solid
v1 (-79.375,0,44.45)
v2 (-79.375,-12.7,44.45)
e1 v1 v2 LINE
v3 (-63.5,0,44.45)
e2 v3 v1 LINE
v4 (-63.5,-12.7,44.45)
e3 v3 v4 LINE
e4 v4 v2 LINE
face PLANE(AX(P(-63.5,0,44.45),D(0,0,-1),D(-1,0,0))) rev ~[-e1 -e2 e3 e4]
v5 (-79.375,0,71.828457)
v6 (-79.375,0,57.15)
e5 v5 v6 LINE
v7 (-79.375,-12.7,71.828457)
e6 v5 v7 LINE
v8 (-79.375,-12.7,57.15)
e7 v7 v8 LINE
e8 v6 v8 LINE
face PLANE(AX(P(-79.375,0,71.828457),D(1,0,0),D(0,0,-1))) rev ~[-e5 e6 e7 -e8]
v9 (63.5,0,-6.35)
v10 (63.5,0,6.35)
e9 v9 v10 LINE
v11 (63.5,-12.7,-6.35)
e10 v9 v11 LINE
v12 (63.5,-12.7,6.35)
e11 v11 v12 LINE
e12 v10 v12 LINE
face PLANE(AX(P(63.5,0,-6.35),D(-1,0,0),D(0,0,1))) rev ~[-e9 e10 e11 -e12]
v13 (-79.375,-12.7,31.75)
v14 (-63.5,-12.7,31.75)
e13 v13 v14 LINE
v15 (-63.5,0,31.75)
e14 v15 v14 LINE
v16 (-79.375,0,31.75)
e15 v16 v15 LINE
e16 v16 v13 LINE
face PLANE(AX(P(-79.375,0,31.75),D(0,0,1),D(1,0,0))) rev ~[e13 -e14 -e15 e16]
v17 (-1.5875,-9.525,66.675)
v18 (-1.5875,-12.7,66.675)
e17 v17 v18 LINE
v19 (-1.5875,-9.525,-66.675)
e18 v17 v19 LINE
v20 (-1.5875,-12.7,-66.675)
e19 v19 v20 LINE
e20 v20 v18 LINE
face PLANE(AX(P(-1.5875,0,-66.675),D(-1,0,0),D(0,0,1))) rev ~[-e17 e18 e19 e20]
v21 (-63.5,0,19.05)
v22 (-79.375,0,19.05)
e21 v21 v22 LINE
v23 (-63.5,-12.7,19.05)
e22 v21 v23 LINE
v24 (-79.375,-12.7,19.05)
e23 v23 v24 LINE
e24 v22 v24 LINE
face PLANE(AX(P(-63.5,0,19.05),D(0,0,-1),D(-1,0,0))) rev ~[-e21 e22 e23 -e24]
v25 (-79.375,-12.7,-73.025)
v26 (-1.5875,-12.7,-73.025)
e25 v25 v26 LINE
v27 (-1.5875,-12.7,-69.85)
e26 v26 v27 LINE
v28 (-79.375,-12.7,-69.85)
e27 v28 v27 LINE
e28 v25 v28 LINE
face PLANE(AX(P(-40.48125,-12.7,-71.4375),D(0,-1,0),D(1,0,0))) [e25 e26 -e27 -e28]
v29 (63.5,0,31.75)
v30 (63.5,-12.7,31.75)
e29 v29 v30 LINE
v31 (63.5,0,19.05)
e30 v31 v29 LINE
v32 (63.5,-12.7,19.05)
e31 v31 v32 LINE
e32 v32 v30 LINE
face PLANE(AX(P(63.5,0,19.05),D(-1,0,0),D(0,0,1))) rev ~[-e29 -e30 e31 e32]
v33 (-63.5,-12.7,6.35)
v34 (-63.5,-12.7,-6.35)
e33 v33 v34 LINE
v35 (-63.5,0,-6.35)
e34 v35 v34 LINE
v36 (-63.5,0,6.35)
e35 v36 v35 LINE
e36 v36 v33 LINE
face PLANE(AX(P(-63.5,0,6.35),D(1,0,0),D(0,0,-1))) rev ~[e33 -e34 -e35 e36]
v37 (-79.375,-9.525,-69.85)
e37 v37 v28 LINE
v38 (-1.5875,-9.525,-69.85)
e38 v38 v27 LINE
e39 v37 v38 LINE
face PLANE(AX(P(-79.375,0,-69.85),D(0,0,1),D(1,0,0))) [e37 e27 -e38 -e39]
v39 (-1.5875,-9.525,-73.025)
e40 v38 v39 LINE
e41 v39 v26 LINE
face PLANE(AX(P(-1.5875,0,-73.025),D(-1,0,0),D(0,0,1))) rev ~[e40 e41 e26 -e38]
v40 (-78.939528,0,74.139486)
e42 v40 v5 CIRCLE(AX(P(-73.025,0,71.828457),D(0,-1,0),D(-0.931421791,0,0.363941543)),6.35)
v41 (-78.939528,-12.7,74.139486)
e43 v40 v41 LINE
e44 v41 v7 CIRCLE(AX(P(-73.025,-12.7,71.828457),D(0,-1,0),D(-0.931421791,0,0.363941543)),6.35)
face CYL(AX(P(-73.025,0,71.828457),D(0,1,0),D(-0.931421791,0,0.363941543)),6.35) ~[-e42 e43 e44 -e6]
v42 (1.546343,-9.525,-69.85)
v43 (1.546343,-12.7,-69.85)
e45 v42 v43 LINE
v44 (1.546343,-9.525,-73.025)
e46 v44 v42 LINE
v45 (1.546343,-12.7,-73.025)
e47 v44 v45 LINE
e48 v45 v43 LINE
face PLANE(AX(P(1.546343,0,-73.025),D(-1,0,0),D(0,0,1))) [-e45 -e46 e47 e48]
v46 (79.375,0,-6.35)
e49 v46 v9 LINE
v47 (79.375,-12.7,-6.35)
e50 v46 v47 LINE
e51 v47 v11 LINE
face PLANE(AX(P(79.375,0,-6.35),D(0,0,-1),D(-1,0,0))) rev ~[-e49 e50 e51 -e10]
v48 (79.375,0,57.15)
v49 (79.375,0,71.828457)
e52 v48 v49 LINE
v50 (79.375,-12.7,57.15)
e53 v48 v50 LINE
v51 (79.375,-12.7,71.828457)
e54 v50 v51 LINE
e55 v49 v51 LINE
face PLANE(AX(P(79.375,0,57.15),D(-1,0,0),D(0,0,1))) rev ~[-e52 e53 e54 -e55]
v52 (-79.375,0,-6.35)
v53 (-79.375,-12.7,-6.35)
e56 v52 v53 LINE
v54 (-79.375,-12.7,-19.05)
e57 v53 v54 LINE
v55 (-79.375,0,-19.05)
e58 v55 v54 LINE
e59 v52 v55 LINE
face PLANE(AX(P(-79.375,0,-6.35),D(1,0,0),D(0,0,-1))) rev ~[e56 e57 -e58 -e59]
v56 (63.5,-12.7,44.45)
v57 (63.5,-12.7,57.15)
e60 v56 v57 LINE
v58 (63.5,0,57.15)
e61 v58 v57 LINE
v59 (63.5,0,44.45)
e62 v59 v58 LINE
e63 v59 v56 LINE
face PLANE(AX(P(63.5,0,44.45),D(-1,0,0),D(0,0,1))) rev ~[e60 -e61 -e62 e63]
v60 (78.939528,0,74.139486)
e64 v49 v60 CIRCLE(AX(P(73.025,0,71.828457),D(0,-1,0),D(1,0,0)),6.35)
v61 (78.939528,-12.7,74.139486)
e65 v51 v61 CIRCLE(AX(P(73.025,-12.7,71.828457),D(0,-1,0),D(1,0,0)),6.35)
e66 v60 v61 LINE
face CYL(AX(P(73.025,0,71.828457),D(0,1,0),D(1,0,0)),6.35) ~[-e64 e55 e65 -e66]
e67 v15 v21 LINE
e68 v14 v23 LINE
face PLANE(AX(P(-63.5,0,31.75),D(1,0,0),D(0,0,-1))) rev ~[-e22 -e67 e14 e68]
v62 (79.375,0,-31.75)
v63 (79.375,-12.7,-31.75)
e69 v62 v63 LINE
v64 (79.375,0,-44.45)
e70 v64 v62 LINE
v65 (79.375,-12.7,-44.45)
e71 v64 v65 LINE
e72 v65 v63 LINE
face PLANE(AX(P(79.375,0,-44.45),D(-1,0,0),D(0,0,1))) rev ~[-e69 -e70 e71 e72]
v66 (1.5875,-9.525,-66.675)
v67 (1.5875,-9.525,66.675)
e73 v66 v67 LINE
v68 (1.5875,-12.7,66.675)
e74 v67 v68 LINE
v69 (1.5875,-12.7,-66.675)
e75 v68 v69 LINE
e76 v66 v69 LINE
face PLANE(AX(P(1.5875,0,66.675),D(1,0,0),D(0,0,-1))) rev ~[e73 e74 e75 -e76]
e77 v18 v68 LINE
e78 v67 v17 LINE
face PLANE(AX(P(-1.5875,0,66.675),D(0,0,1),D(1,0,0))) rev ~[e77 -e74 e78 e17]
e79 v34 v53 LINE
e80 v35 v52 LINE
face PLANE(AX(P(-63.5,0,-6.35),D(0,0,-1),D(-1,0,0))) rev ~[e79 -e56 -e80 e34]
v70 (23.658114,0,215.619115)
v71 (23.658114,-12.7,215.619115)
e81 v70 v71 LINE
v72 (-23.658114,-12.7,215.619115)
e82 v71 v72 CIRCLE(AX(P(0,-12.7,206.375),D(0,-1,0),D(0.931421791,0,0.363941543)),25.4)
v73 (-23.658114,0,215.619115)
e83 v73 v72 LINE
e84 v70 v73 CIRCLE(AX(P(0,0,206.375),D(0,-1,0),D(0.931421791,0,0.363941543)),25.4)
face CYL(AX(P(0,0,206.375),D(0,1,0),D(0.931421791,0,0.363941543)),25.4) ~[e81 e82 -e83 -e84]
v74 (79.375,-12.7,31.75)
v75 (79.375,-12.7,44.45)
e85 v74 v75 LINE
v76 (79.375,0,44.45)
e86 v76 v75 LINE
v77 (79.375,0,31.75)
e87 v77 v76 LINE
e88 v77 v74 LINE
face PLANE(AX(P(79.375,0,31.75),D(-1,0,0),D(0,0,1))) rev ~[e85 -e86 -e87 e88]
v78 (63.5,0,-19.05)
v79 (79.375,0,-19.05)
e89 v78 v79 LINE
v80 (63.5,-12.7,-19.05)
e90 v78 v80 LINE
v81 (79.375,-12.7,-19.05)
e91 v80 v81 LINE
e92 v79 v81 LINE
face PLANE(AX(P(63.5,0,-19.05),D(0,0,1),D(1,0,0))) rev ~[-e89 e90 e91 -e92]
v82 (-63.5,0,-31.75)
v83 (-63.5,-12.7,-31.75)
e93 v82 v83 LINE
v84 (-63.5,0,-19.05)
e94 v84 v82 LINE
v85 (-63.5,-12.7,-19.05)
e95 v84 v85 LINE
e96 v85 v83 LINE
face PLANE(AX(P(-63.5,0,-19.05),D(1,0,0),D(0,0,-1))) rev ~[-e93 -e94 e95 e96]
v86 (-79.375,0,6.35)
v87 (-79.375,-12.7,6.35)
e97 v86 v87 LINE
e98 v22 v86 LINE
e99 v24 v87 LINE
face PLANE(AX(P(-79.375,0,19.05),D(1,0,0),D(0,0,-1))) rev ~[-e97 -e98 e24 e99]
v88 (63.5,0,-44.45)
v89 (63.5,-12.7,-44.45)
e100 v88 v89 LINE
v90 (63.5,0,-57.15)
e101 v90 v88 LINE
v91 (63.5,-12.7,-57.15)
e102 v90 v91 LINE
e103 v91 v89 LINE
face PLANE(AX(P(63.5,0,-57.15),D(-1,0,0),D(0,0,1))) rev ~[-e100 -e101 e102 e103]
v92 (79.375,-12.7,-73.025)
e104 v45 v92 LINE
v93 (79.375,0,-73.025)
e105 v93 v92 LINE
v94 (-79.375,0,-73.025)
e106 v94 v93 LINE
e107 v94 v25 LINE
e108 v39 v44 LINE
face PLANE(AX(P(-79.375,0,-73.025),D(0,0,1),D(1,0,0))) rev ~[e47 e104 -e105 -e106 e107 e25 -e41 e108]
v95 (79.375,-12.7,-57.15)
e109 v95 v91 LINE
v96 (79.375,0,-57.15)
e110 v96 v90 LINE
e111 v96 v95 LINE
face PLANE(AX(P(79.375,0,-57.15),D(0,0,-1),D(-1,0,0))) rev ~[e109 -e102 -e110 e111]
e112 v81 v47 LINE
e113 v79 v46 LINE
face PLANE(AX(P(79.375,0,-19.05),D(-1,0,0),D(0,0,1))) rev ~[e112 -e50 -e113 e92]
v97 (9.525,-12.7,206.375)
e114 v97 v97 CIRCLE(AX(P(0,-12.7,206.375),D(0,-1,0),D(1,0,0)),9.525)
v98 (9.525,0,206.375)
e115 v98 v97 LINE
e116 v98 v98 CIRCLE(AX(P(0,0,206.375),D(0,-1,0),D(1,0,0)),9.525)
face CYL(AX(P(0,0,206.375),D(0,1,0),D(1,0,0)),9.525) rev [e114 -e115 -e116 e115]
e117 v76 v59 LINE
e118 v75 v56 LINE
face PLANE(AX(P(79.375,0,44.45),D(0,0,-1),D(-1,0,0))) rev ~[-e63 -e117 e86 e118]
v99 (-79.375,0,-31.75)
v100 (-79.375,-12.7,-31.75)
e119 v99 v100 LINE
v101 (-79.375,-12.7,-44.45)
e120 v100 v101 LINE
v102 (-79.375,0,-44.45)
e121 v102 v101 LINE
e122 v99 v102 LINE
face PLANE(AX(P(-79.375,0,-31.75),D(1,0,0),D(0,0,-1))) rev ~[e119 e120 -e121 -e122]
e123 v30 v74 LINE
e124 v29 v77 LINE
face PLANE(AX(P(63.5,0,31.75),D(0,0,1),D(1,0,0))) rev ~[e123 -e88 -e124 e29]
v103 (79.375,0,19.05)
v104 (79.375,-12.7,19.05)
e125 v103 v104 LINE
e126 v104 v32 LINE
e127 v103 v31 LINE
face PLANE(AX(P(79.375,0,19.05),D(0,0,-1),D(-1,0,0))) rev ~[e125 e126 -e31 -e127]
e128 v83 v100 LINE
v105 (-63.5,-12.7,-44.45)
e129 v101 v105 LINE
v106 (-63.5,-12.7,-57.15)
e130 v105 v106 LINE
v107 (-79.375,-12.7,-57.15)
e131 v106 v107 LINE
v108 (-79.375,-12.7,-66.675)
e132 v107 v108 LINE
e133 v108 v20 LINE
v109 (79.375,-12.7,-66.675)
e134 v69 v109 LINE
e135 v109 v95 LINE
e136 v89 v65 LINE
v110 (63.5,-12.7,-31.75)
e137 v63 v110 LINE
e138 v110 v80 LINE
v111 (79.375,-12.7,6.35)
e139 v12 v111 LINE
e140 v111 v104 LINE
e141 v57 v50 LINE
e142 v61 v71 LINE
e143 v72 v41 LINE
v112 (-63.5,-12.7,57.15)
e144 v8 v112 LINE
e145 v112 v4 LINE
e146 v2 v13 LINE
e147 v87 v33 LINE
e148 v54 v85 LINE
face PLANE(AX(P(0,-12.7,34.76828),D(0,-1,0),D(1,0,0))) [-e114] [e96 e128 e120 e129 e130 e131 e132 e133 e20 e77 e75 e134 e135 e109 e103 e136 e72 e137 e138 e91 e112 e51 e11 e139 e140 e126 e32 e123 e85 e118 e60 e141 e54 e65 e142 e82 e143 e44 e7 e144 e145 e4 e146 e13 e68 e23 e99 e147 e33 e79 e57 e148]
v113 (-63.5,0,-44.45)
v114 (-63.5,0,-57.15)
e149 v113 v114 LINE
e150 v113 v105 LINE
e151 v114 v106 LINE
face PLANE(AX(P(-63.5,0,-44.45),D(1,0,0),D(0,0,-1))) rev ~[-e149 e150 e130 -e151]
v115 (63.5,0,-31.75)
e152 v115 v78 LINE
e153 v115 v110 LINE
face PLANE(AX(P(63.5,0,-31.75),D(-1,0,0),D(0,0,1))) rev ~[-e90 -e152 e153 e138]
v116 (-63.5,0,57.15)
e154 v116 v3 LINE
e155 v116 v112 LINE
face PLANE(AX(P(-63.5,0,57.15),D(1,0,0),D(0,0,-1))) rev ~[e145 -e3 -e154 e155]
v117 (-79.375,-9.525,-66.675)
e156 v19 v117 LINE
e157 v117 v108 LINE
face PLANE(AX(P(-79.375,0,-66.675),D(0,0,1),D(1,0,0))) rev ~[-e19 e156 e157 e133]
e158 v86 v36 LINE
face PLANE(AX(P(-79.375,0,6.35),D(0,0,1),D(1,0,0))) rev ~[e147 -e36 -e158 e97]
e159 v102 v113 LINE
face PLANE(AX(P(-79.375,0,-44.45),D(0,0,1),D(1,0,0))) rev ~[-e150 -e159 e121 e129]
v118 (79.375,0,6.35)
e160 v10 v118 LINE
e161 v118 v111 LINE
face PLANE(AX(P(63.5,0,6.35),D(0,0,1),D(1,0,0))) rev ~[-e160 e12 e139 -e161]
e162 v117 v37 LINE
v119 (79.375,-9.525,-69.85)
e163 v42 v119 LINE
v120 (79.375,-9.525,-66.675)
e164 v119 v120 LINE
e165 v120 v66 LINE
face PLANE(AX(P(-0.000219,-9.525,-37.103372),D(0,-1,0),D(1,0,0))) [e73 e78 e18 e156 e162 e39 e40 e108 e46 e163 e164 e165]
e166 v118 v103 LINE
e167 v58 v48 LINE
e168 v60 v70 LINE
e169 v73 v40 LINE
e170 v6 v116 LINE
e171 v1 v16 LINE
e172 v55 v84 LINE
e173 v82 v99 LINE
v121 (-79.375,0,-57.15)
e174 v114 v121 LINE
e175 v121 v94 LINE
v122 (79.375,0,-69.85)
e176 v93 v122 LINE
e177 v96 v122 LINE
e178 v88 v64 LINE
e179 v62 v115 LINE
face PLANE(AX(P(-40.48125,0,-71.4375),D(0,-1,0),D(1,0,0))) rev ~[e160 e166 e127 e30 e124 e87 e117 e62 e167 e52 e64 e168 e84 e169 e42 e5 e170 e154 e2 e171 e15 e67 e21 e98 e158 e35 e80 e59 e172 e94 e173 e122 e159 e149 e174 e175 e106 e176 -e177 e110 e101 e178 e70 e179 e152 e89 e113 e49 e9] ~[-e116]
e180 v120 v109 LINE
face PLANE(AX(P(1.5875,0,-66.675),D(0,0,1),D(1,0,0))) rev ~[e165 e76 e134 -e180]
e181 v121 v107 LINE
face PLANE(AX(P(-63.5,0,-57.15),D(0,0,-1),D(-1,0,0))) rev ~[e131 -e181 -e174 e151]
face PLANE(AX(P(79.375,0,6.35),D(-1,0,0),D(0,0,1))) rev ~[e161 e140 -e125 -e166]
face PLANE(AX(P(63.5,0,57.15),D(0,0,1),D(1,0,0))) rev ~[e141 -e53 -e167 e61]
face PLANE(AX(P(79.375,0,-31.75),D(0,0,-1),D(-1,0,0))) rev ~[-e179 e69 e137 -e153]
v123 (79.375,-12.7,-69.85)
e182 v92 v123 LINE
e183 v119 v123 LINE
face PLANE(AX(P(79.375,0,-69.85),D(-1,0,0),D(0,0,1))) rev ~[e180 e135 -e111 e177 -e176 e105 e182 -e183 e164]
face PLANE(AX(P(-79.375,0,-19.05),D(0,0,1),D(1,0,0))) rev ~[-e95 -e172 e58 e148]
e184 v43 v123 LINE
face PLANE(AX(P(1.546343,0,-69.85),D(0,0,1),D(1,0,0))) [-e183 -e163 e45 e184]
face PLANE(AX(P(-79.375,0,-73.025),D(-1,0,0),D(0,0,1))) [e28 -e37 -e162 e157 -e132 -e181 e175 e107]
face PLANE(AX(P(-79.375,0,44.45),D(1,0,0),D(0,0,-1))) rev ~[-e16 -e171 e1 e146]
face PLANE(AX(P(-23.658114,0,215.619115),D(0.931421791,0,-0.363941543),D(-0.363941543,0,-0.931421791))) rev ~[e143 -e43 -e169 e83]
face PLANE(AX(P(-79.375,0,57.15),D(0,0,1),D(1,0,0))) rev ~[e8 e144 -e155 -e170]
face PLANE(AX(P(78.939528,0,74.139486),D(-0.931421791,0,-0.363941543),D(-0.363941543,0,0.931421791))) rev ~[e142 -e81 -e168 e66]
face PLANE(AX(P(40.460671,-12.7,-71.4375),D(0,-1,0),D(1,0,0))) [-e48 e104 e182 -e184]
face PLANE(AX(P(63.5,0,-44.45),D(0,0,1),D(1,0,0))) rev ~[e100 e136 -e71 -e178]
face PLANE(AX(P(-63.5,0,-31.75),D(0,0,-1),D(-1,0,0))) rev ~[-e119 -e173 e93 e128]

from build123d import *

# Parameters (mm, degrees)
F1_DEPTH = 9.525
F0_W     = 77.7875
F0_H     = 3.175
F0_W_2   = 77.8286574921
F0_R     = 9.525
F2_DEPTH = 12.7


with BuildPart() as f1:
    # F0 (on Front) → F1 (new body)
    with BuildSketch(Plane.XZ):
        Polygon((-1.5875, -69.85), (-1.5875, -73.025), (1.5463425079, -73.025), (1.5463425079, -69.85), (79.375, -69.85), (79.375, -66.675), (1.5875, -66.675), (1.5875, 66.675), (-1.5875, 66.675), (-1.5875, -66.675), (-79.375, -66.675), (-79.375, -69.85), align=None)
    extrude(amount=F1_DEPTH)

    # F0 (on Front) → F2 (join)
    with BuildSketch(Plane.XZ):
        with Locations((-40.48125, -71.4375)):
            Rectangle(F0_W, F0_H)
        with Locations((40.460671254, -71.4375)):
            Rectangle(F0_W_2, F0_H)
        with BuildLine():
            Line((-79.375, -57.15), (-79.375, -66.675))
            Line((-79.375, -66.675), (-1.5875, -66.675))
            Line((-1.5875, -66.675), (-1.5875, 66.675))
            Line((-1.5875, 66.675), (1.5875, 66.675))
            Line((1.5875, 66.675), (1.5875, -66.675))
            Line((1.5875, -66.675), (79.375, -66.675))
            Line((79.375, -66.675), (79.375, -57.15))
            Line((79.375, -57.15), (63.5, -57.15))
            Line((63.5, -57.15), (63.5, -44.45))
            Line((63.5, -44.45), (79.375, -44.45))
            Line((79.375, -44.45), (79.375, -31.75))
            Line((79.375, -31.75), (63.5, -31.75))
            Line((63.5, -31.75), (63.5, -19.05))
            Line((63.5, -19.05), (79.375, -19.05))
            Line((79.375, -19.05), (79.375, -6.35))
            Line((79.375, -6.35), (63.5, -6.35))
            Line((63.5, -6.35), (63.5, 6.35))
            Line((63.5, 6.35), (79.375, 6.35))
            Line((79.375, 6.35), (79.375, 19.05))
            Line((79.375, 19.05), (63.5, 19.05))
            Line((63.5, 19.05), (63.5, 31.75))
            Line((63.5, 31.75), (79.375, 31.75))
            Line((79.375, 31.75), (79.375, 44.45))
            Line((79.375, 44.45), (63.5, 44.45))
            Line((63.5, 44.45), (63.5, 57.15))
            Line((63.5, 57.15), (79.375, 57.15))
            Line((79.375, 57.15), (79.375, 71.8284572224))
            ThreePointArc((79.375, 71.8284572224), (79.2651824968, 73.0043068755), (78.9395283758, 74.1394860175))
            Line((78.9395283758, 74.1394860175), (23.6581135032, 215.6191151805))
            ThreePointArc((23.6581135032, 215.6191151805), (0, 231.775), (-23.6581135032, 215.6191151805))
            Line((-23.6581135032, 215.6191151805), (-78.9395283758, 74.1394860175))
            ThreePointArc((-78.9395283758, 74.1394860175), (-79.2651824968, 73.0043068755), (-79.375, 71.8284572224))
            Line((-79.375, 71.8284572224), (-79.375, 57.15))
            Line((-79.375, 57.15), (-63.5, 57.15))
            Line((-63.5, 57.15), (-63.5, 44.45))
            Line((-63.5, 44.45), (-79.375, 44.45))
            Line((-79.375, 44.45), (-79.375, 31.75))
            Line((-79.375, 31.75), (-63.5, 31.75))
            Line((-63.5, 31.75), (-63.5, 19.05))
            Line((-63.5, 19.05), (-79.375, 19.05))
            Line((-79.375, 19.05), (-79.375, 6.35))
            Line((-79.375, 6.35), (-63.5, 6.35))
            Line((-63.5, 6.35), (-63.5, -6.35))
            Line((-63.5, -6.35), (-79.375, -6.35))
            Line((-79.375, -6.35), (-79.375, -19.05))
            Line((-79.375, -19.05), (-63.5, -19.05))
            Line((-63.5, -19.05), (-63.5, -31.75))
            Line((-63.5, -31.75), (-79.375, -31.75))
            Line((-79.375, -31.75), (-79.375, -44.45))
            Line((-79.375, -44.45), (-63.5, -44.45))
            Line((-63.5, -44.45), (-63.5, -57.15))
            Line((-63.5, -57.15), (-79.375, -57.15))
        make_face()
        with Locations((0, 206.375)):
            Circle(F0_R, mode=Mode.SUBTRACT)
    extrude(amount=F2_DEPTH)


solid = f1.part
